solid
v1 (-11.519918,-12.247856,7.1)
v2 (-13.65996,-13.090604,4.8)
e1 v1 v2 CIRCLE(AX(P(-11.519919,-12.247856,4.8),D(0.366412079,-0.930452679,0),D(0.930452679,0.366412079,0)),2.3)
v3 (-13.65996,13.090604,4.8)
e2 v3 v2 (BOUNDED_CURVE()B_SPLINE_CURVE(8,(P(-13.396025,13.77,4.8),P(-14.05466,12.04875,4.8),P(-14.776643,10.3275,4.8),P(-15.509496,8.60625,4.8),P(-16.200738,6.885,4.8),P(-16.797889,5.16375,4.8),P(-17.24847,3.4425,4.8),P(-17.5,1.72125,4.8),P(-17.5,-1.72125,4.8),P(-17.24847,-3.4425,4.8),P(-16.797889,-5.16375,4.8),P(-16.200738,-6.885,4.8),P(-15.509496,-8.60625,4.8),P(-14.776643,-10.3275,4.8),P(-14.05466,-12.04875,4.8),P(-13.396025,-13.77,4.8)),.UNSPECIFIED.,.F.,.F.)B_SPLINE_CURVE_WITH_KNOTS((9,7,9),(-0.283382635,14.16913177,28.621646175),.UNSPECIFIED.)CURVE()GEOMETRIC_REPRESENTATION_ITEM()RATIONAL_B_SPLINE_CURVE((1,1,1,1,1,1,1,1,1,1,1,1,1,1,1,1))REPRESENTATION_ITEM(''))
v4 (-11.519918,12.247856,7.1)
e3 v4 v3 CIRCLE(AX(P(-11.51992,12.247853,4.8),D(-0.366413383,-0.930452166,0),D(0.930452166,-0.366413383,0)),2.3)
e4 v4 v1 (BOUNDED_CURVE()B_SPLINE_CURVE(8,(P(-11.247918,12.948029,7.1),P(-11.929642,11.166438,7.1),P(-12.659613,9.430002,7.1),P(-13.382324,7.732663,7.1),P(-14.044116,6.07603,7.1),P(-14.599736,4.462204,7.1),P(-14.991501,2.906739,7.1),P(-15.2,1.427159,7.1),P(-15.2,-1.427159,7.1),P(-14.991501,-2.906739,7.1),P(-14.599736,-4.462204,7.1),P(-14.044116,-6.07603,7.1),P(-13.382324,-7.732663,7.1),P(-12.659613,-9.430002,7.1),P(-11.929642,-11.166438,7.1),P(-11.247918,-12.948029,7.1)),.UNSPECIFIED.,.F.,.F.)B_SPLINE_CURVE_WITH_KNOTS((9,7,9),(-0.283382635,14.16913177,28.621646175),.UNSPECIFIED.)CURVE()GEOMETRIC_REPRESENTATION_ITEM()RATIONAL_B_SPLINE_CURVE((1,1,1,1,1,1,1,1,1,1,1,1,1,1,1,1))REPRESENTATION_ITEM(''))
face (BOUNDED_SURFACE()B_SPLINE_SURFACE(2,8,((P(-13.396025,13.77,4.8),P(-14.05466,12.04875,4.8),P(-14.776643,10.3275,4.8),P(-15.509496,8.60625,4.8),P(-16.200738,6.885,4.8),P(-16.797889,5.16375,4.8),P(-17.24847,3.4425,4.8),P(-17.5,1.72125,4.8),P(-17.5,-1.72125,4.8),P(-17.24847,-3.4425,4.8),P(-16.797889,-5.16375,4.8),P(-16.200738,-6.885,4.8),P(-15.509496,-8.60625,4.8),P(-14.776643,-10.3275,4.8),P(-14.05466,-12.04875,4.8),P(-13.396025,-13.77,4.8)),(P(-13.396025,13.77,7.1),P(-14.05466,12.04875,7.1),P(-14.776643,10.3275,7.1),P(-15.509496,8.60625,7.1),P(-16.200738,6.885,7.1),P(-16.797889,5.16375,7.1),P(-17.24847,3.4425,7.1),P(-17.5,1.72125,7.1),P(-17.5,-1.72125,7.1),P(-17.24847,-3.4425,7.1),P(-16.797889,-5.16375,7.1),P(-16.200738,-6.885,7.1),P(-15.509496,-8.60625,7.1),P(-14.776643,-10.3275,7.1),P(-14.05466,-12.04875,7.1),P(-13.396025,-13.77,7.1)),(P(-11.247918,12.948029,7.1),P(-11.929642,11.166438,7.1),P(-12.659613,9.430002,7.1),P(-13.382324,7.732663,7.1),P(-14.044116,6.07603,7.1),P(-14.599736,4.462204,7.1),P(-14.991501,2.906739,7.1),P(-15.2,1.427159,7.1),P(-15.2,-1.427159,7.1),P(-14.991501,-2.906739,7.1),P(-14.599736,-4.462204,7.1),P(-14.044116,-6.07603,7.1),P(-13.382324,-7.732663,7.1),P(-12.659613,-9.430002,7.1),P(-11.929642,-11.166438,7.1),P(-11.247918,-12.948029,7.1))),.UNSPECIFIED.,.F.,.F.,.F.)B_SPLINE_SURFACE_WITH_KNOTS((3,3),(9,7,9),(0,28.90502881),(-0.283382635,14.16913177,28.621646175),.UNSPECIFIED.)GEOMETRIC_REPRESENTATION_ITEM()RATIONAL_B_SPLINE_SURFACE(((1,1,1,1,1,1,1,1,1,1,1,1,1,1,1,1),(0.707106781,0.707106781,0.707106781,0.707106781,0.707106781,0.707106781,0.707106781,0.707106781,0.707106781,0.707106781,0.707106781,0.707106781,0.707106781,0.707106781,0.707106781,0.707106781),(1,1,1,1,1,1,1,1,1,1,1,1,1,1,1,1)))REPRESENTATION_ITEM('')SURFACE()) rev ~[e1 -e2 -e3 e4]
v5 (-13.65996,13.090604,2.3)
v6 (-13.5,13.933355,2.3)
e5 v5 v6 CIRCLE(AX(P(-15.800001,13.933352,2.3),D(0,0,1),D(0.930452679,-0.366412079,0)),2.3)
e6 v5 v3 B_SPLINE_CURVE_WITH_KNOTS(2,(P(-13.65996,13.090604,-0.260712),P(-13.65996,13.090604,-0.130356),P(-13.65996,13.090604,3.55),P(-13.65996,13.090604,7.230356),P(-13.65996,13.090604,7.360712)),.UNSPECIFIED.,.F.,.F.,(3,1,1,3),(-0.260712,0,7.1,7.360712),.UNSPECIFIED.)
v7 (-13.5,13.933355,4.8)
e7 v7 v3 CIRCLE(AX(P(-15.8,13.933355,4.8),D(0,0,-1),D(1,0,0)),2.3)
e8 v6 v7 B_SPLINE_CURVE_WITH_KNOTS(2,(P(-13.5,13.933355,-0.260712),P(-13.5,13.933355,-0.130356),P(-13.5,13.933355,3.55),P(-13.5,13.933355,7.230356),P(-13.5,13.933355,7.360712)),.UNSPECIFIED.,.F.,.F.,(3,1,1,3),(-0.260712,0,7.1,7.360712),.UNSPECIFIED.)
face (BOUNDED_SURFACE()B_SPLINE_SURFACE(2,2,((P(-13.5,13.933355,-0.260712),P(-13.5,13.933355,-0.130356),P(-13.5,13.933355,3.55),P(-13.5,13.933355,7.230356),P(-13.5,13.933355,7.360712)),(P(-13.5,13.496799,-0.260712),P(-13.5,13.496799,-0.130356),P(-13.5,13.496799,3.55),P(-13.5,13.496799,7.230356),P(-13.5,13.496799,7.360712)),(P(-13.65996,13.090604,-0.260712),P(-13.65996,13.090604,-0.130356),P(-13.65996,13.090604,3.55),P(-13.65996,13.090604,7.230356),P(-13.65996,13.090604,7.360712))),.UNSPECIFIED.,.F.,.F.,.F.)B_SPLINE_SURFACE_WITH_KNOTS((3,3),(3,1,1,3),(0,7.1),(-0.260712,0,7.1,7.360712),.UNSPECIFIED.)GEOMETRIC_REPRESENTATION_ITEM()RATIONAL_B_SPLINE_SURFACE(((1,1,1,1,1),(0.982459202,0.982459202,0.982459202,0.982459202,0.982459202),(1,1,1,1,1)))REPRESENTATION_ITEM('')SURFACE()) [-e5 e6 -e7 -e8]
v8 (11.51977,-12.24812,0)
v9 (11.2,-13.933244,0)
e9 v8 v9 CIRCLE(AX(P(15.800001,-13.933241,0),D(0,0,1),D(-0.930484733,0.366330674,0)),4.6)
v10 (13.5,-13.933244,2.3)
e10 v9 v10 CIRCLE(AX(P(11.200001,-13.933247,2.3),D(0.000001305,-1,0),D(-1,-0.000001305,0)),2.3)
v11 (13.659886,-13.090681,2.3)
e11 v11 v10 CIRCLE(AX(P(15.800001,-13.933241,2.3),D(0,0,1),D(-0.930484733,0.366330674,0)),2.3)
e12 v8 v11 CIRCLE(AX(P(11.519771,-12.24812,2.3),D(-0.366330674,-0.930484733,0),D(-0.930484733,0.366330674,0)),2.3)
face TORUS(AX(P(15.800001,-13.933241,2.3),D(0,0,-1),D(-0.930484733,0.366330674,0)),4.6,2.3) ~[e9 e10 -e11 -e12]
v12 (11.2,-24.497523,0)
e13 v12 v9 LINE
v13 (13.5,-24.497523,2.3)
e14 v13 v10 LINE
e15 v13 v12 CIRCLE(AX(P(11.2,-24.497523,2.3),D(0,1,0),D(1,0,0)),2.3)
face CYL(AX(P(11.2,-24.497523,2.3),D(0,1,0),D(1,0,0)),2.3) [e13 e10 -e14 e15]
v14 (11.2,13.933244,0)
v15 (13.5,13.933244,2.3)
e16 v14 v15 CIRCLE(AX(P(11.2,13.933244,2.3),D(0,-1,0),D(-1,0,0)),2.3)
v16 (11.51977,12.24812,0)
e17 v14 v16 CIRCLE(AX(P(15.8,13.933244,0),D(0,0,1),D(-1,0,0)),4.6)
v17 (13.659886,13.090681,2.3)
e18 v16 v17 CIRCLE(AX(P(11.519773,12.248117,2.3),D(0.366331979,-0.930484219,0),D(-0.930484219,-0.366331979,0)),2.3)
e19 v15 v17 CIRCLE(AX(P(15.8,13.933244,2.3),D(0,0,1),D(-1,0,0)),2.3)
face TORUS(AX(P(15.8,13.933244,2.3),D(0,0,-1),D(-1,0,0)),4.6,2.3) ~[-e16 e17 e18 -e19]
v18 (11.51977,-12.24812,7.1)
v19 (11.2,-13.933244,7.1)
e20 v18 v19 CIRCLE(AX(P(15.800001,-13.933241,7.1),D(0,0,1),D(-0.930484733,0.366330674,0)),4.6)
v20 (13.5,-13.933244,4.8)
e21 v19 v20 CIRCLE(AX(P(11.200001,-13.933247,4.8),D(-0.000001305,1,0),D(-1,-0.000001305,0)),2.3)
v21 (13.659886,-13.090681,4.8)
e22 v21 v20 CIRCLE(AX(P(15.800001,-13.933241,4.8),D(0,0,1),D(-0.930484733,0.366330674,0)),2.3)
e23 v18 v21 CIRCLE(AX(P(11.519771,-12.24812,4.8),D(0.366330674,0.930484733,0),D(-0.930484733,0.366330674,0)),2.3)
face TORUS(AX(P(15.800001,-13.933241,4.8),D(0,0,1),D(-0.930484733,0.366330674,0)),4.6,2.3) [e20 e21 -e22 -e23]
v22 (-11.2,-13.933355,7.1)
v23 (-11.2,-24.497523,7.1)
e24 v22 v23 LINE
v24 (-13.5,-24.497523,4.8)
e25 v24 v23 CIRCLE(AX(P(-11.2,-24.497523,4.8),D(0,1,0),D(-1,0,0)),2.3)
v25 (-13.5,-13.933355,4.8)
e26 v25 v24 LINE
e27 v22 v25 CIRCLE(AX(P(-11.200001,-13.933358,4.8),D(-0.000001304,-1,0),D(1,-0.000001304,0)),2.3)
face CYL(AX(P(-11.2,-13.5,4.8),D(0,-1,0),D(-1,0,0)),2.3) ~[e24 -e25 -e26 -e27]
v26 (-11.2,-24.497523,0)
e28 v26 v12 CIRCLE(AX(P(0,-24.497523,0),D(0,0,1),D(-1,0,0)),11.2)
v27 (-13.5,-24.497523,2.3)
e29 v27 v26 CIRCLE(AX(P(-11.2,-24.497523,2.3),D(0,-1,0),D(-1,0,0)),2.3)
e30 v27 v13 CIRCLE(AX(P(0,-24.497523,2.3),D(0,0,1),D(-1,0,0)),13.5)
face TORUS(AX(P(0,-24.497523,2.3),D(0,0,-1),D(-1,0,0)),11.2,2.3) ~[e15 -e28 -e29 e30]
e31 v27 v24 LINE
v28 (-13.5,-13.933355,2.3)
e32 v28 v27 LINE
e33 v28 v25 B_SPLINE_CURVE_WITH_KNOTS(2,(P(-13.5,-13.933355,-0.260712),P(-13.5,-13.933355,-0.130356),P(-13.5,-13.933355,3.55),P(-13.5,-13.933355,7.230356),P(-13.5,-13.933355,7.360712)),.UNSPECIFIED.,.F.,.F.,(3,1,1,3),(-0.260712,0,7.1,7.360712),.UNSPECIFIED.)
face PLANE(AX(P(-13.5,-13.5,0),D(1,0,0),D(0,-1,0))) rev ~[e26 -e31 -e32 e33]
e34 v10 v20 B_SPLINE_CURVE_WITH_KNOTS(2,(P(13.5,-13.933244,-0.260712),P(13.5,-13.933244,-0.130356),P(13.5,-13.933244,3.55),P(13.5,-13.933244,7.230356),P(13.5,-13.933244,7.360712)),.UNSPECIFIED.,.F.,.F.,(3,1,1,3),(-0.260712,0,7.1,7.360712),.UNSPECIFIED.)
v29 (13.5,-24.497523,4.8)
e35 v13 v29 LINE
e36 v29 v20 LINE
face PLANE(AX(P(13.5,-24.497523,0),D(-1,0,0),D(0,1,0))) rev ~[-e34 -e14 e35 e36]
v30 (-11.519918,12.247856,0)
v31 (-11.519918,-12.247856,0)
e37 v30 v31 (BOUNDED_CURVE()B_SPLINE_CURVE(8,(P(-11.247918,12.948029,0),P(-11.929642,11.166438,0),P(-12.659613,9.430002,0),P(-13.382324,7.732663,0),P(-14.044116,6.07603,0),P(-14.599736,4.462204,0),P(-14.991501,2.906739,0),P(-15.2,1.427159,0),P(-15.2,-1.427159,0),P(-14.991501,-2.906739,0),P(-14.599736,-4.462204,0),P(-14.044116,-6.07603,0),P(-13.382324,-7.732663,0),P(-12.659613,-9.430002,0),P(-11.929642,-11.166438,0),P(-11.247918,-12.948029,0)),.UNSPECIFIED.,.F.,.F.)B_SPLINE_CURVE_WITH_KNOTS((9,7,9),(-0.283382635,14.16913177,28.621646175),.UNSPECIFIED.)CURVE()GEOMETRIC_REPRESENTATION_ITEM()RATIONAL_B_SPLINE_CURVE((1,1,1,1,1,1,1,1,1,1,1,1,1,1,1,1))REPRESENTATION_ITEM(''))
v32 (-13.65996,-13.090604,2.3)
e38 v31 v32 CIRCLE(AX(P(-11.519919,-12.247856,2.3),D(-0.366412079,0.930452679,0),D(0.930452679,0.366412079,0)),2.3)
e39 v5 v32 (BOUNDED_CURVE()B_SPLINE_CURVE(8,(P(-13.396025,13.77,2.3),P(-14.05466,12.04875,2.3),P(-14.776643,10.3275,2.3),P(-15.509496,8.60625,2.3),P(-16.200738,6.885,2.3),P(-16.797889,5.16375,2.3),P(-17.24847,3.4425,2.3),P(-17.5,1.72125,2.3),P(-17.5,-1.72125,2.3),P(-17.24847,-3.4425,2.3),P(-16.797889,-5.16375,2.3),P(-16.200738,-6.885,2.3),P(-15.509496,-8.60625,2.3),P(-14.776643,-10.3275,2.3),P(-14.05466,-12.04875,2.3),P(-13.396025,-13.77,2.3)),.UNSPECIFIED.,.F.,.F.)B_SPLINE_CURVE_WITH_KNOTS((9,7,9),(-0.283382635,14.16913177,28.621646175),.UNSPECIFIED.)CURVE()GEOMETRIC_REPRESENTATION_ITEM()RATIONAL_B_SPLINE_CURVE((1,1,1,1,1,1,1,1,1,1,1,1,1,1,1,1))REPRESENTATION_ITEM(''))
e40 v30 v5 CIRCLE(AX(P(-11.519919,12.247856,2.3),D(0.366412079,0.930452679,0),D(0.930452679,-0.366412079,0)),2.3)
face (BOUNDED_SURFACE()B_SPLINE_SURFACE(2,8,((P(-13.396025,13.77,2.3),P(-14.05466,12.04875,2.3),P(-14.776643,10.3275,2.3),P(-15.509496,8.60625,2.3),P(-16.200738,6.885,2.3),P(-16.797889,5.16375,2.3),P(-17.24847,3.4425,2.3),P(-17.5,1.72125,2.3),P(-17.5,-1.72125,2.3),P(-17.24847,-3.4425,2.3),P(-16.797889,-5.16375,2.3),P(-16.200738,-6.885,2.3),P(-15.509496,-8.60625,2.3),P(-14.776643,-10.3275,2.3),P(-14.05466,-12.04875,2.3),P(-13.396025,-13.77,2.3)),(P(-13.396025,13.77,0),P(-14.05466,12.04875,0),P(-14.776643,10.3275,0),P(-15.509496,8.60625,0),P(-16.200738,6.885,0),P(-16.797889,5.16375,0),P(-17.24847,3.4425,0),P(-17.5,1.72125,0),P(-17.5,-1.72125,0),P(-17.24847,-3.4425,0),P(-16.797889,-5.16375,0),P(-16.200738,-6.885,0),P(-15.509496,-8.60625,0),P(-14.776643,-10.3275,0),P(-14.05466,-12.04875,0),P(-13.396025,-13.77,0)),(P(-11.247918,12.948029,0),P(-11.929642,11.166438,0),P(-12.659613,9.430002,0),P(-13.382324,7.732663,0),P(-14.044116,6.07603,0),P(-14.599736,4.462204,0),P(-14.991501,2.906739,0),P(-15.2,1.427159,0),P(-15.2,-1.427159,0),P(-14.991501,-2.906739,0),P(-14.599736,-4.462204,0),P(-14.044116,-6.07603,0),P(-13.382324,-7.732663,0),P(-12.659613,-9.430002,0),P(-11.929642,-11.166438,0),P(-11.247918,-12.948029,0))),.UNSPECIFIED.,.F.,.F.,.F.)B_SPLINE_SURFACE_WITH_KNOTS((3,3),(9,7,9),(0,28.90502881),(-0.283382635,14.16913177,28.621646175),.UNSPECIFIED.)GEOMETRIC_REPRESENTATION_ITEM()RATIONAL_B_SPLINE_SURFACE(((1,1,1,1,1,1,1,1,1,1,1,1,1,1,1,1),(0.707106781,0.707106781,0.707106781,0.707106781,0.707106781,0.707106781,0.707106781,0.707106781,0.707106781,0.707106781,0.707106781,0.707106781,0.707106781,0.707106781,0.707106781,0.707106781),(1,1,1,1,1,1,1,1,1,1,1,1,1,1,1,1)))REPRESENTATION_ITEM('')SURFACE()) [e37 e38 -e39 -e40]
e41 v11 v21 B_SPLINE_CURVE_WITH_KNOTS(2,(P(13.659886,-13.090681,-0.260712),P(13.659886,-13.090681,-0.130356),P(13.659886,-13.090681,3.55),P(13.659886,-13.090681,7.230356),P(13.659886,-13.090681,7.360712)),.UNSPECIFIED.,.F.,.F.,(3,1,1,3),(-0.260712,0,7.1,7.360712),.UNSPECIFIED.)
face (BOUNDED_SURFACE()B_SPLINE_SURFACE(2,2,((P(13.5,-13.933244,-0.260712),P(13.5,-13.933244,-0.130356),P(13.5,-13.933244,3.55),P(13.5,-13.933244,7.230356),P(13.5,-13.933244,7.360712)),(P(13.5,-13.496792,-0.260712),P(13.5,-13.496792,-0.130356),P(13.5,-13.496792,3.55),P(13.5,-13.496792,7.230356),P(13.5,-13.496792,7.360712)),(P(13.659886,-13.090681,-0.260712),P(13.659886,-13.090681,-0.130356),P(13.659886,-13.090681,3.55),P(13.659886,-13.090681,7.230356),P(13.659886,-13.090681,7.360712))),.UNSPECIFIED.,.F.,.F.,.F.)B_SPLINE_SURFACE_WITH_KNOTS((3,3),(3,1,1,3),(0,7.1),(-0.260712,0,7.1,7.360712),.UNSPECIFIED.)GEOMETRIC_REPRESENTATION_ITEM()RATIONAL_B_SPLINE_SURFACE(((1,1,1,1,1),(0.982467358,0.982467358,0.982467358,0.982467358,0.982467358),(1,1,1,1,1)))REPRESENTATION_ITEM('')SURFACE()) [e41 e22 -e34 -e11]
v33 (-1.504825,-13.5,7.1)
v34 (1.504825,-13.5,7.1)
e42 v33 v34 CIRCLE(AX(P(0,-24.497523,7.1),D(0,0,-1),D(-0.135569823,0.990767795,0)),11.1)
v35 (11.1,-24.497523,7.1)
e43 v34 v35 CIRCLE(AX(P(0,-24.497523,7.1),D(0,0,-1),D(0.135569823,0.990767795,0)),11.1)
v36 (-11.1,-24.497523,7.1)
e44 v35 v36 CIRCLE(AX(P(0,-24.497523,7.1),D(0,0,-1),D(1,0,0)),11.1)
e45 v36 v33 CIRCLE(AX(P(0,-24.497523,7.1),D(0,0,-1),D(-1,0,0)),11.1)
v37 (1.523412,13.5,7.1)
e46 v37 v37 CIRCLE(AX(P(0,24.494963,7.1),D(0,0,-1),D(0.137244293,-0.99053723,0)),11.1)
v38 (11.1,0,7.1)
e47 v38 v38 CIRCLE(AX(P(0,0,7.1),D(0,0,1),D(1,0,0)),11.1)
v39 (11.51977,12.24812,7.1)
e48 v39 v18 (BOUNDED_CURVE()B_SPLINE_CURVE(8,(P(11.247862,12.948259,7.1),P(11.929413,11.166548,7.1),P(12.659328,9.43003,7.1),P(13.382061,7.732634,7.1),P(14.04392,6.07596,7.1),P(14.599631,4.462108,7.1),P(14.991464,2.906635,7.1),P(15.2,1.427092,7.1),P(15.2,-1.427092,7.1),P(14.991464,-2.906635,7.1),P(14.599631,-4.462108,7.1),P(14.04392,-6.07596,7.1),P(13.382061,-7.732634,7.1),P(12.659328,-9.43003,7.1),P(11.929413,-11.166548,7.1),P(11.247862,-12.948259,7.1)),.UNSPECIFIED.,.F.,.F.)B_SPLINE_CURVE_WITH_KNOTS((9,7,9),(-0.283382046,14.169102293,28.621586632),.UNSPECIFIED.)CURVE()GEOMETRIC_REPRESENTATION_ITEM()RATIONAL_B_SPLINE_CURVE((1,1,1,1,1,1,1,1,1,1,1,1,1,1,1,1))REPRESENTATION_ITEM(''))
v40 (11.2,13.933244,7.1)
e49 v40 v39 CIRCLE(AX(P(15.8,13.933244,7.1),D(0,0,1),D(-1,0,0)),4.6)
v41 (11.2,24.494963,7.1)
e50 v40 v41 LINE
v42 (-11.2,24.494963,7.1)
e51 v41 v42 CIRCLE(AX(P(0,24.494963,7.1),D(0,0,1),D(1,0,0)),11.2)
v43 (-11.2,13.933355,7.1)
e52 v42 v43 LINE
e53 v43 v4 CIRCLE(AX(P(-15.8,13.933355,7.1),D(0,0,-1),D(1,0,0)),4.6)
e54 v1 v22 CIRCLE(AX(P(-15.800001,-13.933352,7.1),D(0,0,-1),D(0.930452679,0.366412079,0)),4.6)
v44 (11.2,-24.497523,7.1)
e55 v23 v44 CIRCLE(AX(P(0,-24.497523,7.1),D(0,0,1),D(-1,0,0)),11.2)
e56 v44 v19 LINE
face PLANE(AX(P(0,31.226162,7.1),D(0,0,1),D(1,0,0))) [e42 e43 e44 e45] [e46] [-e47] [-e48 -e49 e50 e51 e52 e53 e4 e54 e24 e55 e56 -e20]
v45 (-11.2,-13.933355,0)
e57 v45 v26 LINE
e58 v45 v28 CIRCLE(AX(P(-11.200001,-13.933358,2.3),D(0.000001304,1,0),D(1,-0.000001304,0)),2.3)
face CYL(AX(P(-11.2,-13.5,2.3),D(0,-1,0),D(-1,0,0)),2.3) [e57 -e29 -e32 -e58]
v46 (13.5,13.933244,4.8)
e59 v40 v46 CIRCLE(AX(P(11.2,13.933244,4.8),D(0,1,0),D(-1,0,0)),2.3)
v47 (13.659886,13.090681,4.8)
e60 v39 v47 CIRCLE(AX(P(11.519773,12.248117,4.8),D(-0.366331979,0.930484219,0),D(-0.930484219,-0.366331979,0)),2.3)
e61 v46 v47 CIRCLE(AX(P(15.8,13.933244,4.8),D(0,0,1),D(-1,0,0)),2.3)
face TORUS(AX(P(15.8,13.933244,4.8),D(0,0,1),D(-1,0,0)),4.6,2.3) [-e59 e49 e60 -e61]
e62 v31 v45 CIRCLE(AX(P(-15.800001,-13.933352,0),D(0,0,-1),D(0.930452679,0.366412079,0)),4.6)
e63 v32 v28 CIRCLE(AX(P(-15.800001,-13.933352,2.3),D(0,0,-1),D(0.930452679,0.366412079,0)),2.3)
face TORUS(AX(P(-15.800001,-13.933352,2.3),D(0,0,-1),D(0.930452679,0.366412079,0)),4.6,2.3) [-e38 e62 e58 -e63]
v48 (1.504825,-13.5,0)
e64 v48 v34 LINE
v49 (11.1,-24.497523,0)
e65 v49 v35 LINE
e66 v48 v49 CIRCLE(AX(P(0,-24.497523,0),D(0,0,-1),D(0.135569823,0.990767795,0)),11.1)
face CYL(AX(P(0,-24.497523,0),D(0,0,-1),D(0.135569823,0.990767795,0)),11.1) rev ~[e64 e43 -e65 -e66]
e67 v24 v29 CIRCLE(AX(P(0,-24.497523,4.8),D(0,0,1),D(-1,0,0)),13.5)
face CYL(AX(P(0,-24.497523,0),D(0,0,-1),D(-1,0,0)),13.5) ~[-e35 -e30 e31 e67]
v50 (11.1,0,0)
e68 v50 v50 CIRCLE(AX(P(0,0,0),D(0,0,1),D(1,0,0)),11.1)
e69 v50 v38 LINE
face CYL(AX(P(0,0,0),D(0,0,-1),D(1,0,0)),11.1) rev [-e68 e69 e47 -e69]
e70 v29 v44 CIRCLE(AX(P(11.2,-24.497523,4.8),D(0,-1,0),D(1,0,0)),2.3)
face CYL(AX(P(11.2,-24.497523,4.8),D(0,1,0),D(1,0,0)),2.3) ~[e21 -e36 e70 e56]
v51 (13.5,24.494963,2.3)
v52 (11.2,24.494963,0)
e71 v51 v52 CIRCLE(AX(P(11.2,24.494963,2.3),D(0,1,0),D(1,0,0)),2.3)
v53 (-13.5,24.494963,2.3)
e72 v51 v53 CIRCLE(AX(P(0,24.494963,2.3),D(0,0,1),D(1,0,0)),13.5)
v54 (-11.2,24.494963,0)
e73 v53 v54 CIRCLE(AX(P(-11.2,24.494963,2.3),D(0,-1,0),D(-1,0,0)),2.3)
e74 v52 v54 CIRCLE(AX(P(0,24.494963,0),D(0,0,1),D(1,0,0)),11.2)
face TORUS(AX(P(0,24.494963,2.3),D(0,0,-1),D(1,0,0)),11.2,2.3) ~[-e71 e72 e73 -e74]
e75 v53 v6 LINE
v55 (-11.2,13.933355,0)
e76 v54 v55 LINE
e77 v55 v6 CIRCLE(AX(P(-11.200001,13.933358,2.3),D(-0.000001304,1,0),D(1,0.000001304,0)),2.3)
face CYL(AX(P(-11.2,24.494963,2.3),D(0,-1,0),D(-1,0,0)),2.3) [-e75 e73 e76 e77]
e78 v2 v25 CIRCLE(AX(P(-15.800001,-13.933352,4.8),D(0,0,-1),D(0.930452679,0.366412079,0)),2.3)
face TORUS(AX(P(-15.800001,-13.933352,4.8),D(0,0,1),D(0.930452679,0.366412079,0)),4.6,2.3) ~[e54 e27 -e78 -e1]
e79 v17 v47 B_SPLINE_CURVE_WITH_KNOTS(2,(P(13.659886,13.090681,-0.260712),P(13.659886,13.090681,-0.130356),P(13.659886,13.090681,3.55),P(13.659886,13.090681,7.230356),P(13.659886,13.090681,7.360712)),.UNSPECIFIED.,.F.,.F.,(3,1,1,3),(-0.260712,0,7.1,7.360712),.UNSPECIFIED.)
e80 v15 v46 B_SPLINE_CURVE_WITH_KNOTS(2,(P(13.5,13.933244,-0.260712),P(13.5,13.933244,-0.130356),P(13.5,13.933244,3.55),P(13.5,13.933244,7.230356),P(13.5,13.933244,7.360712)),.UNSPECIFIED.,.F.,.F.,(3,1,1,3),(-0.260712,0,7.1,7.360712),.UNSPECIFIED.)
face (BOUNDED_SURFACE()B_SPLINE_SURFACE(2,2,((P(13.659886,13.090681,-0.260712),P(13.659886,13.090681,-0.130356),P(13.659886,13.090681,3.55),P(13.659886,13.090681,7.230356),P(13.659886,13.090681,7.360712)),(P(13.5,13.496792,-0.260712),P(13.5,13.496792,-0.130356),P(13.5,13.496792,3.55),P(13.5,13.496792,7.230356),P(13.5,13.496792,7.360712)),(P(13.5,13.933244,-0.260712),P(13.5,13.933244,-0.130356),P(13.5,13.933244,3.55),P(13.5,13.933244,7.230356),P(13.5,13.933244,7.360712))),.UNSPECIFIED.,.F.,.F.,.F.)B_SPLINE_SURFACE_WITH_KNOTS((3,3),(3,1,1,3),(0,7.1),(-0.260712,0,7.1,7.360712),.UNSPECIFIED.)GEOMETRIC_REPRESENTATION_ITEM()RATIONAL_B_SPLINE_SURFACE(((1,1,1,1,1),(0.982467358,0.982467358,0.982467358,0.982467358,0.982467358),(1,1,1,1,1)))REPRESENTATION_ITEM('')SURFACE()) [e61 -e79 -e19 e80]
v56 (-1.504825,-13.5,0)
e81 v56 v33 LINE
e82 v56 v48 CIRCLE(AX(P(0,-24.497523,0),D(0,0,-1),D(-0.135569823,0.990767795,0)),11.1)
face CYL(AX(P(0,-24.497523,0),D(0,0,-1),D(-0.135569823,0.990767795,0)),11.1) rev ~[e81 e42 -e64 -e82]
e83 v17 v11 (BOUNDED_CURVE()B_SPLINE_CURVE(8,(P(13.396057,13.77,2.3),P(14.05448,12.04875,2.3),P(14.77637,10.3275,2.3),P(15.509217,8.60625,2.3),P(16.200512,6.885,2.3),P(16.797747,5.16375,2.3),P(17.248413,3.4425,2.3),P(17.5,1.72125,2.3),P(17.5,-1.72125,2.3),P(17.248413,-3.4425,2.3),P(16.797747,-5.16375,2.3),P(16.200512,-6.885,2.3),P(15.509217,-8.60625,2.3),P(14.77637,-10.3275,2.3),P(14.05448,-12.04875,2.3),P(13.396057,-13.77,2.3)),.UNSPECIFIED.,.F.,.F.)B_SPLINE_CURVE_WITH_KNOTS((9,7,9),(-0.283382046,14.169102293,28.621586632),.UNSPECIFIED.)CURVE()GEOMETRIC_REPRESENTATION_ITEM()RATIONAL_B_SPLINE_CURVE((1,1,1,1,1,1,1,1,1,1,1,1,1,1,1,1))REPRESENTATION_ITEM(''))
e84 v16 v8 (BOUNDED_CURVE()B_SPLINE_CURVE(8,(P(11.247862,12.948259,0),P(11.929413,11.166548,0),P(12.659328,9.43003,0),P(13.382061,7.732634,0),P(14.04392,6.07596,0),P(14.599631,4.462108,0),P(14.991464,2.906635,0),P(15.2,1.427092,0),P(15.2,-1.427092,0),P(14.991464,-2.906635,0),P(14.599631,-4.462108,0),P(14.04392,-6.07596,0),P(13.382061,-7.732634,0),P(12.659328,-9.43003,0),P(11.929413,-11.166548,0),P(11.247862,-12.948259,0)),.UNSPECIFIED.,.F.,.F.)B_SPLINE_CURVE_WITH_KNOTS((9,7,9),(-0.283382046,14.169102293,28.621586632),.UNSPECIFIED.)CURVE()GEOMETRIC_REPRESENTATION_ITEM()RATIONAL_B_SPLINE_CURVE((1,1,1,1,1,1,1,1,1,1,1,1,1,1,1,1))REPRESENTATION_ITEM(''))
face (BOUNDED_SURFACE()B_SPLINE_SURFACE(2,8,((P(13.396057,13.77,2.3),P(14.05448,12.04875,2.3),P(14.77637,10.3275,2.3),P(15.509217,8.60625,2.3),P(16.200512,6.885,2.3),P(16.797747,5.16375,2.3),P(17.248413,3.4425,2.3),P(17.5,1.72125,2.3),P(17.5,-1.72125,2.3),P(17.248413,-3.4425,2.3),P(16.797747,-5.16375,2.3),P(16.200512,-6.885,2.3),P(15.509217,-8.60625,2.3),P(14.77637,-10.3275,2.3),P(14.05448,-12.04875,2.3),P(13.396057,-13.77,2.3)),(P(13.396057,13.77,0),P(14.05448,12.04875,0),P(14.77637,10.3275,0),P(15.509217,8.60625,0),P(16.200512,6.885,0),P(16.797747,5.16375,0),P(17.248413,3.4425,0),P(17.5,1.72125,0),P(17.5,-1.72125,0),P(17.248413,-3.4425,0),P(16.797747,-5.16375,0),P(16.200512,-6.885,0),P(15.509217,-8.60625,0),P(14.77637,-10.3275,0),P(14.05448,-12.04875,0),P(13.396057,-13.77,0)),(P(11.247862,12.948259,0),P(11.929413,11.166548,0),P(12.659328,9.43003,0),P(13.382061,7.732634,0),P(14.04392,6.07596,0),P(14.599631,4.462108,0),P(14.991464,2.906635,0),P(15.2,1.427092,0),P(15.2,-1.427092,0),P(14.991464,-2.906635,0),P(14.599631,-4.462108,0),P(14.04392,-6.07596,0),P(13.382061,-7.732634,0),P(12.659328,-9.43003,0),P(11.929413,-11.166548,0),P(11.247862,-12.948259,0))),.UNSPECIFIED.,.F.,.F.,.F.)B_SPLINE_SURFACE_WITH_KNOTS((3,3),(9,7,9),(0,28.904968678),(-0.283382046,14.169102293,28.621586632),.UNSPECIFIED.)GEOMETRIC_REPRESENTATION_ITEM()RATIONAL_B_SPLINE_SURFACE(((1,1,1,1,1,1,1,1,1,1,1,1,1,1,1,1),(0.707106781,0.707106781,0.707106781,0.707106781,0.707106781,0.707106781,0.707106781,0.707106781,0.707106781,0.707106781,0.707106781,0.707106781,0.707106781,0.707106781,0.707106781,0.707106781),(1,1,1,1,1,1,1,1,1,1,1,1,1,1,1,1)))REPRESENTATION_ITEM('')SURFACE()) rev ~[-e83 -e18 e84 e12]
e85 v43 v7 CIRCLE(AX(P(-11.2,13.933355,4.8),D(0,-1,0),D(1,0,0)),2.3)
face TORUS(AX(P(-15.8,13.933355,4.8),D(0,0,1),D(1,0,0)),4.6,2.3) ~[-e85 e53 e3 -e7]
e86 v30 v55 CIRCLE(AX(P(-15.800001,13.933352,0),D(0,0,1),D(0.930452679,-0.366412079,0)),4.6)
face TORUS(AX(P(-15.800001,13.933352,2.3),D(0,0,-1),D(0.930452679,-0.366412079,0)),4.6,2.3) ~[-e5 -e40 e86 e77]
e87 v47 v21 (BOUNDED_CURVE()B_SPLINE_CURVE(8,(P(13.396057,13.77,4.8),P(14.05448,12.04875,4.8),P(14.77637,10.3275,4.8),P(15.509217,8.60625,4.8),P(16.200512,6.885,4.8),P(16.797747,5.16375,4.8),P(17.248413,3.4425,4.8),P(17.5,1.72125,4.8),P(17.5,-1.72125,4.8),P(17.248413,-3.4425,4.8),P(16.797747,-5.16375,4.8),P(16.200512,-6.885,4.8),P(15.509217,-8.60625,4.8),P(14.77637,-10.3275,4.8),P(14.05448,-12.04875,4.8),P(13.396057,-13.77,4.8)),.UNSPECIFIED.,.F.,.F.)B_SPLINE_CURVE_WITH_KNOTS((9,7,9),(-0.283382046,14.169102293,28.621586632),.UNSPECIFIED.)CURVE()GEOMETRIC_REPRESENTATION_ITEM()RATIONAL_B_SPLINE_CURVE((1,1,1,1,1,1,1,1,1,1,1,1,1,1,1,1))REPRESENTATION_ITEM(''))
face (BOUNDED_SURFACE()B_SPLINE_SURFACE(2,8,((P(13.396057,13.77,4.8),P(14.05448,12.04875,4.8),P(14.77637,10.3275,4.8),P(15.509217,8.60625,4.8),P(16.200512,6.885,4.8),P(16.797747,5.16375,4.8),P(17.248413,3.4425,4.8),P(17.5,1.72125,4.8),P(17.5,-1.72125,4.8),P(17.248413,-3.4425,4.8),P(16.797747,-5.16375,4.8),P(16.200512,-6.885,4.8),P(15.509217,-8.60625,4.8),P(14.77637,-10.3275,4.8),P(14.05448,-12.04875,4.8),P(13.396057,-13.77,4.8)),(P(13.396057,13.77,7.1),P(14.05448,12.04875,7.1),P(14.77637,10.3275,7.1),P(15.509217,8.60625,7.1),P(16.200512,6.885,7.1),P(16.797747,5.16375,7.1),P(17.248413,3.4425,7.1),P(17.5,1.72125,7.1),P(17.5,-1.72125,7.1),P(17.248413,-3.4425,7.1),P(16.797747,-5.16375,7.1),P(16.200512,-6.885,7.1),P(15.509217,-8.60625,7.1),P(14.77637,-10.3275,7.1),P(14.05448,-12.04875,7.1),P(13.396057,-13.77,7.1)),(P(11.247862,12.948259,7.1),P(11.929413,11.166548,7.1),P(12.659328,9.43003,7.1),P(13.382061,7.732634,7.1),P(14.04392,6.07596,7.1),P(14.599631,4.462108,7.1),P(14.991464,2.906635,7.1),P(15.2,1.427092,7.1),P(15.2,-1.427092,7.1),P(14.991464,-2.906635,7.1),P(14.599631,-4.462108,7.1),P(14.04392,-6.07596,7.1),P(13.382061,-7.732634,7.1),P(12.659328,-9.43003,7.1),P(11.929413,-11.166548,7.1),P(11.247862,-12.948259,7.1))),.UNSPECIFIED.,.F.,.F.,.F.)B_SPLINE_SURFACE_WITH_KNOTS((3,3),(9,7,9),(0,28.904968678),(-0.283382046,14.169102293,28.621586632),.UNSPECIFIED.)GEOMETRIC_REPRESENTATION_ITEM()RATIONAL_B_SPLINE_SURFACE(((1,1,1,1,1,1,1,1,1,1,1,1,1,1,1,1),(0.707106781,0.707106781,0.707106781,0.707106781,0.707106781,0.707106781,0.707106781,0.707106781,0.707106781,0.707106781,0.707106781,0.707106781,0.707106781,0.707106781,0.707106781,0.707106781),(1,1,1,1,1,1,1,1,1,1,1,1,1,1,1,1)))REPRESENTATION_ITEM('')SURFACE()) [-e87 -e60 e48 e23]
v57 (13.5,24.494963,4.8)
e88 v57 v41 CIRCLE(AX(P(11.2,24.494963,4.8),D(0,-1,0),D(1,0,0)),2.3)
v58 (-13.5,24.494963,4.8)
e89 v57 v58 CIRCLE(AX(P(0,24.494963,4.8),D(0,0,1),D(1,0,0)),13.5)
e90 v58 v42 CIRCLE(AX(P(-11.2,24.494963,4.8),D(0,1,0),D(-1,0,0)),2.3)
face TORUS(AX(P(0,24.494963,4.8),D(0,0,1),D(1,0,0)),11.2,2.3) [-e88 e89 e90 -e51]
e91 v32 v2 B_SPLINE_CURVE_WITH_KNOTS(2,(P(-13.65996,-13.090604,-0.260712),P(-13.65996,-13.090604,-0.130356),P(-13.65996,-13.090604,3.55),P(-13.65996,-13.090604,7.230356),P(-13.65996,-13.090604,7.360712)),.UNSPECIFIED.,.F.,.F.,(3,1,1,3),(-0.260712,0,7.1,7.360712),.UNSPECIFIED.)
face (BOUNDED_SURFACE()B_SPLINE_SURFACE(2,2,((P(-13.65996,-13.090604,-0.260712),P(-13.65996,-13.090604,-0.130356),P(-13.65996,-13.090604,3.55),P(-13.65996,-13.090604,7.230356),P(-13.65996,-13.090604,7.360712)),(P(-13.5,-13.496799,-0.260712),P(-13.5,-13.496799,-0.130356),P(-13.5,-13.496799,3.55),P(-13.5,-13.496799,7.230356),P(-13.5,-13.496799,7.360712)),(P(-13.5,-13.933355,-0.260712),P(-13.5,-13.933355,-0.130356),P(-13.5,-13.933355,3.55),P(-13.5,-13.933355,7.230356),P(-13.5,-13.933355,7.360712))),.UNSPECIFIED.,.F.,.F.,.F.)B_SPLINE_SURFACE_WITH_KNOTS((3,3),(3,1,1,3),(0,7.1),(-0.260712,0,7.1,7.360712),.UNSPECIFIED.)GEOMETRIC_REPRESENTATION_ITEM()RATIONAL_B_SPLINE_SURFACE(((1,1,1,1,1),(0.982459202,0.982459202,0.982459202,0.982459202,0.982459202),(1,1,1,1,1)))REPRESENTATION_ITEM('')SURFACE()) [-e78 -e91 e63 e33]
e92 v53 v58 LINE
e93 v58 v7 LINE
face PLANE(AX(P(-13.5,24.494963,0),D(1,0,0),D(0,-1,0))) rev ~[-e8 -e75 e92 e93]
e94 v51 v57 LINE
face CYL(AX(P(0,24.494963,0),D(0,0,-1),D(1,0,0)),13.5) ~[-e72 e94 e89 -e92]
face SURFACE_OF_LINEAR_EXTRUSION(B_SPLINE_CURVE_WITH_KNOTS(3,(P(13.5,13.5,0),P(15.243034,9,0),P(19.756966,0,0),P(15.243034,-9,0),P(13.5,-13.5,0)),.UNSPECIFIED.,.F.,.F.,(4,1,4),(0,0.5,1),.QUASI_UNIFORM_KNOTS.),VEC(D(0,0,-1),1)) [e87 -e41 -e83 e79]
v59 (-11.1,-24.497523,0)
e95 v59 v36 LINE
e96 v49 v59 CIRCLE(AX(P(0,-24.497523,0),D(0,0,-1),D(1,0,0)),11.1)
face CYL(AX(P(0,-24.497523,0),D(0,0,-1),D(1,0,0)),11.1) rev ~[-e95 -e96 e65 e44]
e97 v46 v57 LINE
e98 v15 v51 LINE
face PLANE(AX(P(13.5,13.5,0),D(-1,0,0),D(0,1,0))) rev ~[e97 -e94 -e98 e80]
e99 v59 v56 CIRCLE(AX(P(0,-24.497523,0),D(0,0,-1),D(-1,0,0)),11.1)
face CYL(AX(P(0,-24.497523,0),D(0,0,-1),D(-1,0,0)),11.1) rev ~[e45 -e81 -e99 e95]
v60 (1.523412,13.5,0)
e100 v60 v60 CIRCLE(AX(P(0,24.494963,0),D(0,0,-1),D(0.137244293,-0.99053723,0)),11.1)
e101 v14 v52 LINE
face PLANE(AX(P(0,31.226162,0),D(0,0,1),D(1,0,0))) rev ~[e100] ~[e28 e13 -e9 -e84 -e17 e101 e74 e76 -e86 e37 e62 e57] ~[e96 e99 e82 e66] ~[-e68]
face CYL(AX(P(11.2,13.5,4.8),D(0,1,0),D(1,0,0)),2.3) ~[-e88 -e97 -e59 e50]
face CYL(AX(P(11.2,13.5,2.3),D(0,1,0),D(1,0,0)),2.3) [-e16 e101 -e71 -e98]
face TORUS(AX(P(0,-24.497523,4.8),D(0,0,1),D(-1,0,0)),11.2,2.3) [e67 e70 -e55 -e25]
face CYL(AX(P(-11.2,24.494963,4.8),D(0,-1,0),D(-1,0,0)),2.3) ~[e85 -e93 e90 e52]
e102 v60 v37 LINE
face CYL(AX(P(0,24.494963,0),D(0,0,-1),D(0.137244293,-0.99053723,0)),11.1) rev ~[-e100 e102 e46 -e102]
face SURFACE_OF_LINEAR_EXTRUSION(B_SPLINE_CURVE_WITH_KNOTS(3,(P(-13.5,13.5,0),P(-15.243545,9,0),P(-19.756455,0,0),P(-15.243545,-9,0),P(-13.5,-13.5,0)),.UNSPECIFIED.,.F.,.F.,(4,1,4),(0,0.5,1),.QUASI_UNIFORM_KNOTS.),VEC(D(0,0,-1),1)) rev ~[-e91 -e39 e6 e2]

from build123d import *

# Parameters (mm, degrees)
F0_R     = 11.1
F1_DEPTH = 7.1
F2_R     = 2.3


with BuildPart() as f1:
    # F0 (on Top) → F1 (new body)
    with BuildSketch(Plane.XY):
        with BuildLine():
            Line((11.1, 24.4949632536), (13.5, 24.4949632536))
            ThreePointArc((13.5, 24.4949632536), (0, 37.9949632536), (-13.5, 24.4949632536))
            Line((-13.5, 24.4949632536), (-11.1, 24.4949632536))
            ThreePointArc((-11.1, 24.4949632536), (0, 35.5949632536), (11.1, 24.4949632536))
        make_face()
        with BuildLine():
            Line((-13.5, 13.5), (-1.5234116489, 13.5))
            ThreePointArc((-1.5234116489, 13.5), (-8.3701812795, 17.2045541191), (-11.1, 24.4949632536))
            Line((-11.1, 24.4949632536), (-13.5, 24.4949632536))
            Line((-13.5, 24.4949632536), (-13.5, 13.5))
        make_face()
        with BuildLine():
            Line((1.5234116489, 13.5), (13.5, 13.5))
            Line((13.5, 13.5), (13.5, 24.4949632536))
            Line((13.5, 24.4949632536), (11.1, 24.4949632536))
            ThreePointArc((11.1, 24.4949632536), (8.3701812795, 17.2045541191), (1.5234116489, 13.5))
        make_face()
        with BuildLine():
            Line((13.5, -13.5), (13.5, 13.5))
            Line((13.5, 13.5), (1.5234116489, 13.5))
            ThreePointArc((1.5234116489, 13.5), (0, 13.3949632536), (-1.5234116489, 13.5))
            Line((-1.5234116489, 13.5), (-13.5, 13.5))
            Line((-13.5, 13.5), (-13.5, -13.5))
            Line((-13.5, -13.5), (-1.5048250316, -13.5))
            ThreePointArc((-1.5048250316, -13.5), (0, -13.3975225221), (1.5048250316, -13.5))
            Line((1.5048250316, -13.5), (13.5, -13.5))
        make_face()
        Circle(F0_R, mode=Mode.SUBTRACT)
        with BuildLine():
            add(Edge.make_bspline(
                [(13.5, 13.5), (15.2430341691, 9), (19.7569658309, 0), (15.2430341691, -9), (13.5, -13.5)],
                knots=[0, 0, 0, 0, 0.5, 1, 1, 1, 1], degree=3))
            Line((13.5, 13.5), (13.5, -13.5))
        make_face()
        with BuildLine():
            Line((-13.5, -13.5), (-13.5, 13.5))
            add(Edge.make_bspline(
                [(-13.5, 13.5), (-15.2435445338, 9), (-19.7564554662, 0), (-15.2435445338, -9), (-13.5, -13.5)],
                knots=[0, 0, 0, 0, 0.5, 1, 1, 1, 1], degree=3))
        make_face()
        with BuildLine():
            ThreePointArc((-11.1, -24.4975225221), (-8.3640169133, -17.2000420614), (-1.5048250316, -13.5))
            Line((-1.5048250316, -13.5), (-13.5, -13.5))
            Line((-13.5, -13.5), (-13.5, -24.4975225221))
            Line((-13.5, -24.4975225221), (-11.1, -24.4975225221))
        make_face()
        with BuildLine():
            Line((13.5, -24.4975225221), (13.5, -13.5))
            Line((13.5, -13.5), (1.5048250316, -13.5))
            ThreePointArc((1.5048250316, -13.5), (8.3640169133, -17.2000420614), (11.1, -24.4975225221))
            Line((11.1, -24.4975225221), (13.5, -24.4975225221))
        make_face()
        with BuildLine():
            ThreePointArc((-13.5, -24.4975225221), (0, -37.9975225221), (13.5, -24.4975225221))
            Line((13.5, -24.4975225221), (11.1, -24.4975225221))
            ThreePointArc((11.1, -24.4975225221), (0, -35.5975225221), (-11.1, -24.4975225221))
            Line((-11.1, -24.4975225221), (-13.5, -24.4975225221))
        make_face()
    extrude(amount=F1_DEPTH)

    # F2
    f2_edges = [f1.edges().sort_by_distance(p)[0] for p in [
        (13.5, -13.5, 3.55),
        (17.5, 0, 7.1),
        (17.5, 0, 0),
        (13.5, 13.5, 3.55),
        (13.5, 18.997482, 7.1),
        (0, 37.994963, 7.1),
        (0, 37.994963, 0),
        (13.5, 24.494963, 3.55),
        (13.5, 18.997482, 0),
        (-13.5, 18.997482, 7.1),
        (-17.5, 0, 7.1),
        (0, -37.997523, 7.1),
        (-13.5, -18.998761, 7.1),
        (13.5, -18.998761, 7.1),
        (13.5, -18.998761, 0),
        (0, -37.997523, 0),
        (-13.5, -13.5, 3.55),
        (-13.5, 13.5, 3.55),
        (-13.5, 18.997482, 0),
        (-17.5, 0, 0),
        (-13.5, -18.998761, 0),
    ]]
    fillet(f2_edges, radius=F2_R)


solid = f1.part
